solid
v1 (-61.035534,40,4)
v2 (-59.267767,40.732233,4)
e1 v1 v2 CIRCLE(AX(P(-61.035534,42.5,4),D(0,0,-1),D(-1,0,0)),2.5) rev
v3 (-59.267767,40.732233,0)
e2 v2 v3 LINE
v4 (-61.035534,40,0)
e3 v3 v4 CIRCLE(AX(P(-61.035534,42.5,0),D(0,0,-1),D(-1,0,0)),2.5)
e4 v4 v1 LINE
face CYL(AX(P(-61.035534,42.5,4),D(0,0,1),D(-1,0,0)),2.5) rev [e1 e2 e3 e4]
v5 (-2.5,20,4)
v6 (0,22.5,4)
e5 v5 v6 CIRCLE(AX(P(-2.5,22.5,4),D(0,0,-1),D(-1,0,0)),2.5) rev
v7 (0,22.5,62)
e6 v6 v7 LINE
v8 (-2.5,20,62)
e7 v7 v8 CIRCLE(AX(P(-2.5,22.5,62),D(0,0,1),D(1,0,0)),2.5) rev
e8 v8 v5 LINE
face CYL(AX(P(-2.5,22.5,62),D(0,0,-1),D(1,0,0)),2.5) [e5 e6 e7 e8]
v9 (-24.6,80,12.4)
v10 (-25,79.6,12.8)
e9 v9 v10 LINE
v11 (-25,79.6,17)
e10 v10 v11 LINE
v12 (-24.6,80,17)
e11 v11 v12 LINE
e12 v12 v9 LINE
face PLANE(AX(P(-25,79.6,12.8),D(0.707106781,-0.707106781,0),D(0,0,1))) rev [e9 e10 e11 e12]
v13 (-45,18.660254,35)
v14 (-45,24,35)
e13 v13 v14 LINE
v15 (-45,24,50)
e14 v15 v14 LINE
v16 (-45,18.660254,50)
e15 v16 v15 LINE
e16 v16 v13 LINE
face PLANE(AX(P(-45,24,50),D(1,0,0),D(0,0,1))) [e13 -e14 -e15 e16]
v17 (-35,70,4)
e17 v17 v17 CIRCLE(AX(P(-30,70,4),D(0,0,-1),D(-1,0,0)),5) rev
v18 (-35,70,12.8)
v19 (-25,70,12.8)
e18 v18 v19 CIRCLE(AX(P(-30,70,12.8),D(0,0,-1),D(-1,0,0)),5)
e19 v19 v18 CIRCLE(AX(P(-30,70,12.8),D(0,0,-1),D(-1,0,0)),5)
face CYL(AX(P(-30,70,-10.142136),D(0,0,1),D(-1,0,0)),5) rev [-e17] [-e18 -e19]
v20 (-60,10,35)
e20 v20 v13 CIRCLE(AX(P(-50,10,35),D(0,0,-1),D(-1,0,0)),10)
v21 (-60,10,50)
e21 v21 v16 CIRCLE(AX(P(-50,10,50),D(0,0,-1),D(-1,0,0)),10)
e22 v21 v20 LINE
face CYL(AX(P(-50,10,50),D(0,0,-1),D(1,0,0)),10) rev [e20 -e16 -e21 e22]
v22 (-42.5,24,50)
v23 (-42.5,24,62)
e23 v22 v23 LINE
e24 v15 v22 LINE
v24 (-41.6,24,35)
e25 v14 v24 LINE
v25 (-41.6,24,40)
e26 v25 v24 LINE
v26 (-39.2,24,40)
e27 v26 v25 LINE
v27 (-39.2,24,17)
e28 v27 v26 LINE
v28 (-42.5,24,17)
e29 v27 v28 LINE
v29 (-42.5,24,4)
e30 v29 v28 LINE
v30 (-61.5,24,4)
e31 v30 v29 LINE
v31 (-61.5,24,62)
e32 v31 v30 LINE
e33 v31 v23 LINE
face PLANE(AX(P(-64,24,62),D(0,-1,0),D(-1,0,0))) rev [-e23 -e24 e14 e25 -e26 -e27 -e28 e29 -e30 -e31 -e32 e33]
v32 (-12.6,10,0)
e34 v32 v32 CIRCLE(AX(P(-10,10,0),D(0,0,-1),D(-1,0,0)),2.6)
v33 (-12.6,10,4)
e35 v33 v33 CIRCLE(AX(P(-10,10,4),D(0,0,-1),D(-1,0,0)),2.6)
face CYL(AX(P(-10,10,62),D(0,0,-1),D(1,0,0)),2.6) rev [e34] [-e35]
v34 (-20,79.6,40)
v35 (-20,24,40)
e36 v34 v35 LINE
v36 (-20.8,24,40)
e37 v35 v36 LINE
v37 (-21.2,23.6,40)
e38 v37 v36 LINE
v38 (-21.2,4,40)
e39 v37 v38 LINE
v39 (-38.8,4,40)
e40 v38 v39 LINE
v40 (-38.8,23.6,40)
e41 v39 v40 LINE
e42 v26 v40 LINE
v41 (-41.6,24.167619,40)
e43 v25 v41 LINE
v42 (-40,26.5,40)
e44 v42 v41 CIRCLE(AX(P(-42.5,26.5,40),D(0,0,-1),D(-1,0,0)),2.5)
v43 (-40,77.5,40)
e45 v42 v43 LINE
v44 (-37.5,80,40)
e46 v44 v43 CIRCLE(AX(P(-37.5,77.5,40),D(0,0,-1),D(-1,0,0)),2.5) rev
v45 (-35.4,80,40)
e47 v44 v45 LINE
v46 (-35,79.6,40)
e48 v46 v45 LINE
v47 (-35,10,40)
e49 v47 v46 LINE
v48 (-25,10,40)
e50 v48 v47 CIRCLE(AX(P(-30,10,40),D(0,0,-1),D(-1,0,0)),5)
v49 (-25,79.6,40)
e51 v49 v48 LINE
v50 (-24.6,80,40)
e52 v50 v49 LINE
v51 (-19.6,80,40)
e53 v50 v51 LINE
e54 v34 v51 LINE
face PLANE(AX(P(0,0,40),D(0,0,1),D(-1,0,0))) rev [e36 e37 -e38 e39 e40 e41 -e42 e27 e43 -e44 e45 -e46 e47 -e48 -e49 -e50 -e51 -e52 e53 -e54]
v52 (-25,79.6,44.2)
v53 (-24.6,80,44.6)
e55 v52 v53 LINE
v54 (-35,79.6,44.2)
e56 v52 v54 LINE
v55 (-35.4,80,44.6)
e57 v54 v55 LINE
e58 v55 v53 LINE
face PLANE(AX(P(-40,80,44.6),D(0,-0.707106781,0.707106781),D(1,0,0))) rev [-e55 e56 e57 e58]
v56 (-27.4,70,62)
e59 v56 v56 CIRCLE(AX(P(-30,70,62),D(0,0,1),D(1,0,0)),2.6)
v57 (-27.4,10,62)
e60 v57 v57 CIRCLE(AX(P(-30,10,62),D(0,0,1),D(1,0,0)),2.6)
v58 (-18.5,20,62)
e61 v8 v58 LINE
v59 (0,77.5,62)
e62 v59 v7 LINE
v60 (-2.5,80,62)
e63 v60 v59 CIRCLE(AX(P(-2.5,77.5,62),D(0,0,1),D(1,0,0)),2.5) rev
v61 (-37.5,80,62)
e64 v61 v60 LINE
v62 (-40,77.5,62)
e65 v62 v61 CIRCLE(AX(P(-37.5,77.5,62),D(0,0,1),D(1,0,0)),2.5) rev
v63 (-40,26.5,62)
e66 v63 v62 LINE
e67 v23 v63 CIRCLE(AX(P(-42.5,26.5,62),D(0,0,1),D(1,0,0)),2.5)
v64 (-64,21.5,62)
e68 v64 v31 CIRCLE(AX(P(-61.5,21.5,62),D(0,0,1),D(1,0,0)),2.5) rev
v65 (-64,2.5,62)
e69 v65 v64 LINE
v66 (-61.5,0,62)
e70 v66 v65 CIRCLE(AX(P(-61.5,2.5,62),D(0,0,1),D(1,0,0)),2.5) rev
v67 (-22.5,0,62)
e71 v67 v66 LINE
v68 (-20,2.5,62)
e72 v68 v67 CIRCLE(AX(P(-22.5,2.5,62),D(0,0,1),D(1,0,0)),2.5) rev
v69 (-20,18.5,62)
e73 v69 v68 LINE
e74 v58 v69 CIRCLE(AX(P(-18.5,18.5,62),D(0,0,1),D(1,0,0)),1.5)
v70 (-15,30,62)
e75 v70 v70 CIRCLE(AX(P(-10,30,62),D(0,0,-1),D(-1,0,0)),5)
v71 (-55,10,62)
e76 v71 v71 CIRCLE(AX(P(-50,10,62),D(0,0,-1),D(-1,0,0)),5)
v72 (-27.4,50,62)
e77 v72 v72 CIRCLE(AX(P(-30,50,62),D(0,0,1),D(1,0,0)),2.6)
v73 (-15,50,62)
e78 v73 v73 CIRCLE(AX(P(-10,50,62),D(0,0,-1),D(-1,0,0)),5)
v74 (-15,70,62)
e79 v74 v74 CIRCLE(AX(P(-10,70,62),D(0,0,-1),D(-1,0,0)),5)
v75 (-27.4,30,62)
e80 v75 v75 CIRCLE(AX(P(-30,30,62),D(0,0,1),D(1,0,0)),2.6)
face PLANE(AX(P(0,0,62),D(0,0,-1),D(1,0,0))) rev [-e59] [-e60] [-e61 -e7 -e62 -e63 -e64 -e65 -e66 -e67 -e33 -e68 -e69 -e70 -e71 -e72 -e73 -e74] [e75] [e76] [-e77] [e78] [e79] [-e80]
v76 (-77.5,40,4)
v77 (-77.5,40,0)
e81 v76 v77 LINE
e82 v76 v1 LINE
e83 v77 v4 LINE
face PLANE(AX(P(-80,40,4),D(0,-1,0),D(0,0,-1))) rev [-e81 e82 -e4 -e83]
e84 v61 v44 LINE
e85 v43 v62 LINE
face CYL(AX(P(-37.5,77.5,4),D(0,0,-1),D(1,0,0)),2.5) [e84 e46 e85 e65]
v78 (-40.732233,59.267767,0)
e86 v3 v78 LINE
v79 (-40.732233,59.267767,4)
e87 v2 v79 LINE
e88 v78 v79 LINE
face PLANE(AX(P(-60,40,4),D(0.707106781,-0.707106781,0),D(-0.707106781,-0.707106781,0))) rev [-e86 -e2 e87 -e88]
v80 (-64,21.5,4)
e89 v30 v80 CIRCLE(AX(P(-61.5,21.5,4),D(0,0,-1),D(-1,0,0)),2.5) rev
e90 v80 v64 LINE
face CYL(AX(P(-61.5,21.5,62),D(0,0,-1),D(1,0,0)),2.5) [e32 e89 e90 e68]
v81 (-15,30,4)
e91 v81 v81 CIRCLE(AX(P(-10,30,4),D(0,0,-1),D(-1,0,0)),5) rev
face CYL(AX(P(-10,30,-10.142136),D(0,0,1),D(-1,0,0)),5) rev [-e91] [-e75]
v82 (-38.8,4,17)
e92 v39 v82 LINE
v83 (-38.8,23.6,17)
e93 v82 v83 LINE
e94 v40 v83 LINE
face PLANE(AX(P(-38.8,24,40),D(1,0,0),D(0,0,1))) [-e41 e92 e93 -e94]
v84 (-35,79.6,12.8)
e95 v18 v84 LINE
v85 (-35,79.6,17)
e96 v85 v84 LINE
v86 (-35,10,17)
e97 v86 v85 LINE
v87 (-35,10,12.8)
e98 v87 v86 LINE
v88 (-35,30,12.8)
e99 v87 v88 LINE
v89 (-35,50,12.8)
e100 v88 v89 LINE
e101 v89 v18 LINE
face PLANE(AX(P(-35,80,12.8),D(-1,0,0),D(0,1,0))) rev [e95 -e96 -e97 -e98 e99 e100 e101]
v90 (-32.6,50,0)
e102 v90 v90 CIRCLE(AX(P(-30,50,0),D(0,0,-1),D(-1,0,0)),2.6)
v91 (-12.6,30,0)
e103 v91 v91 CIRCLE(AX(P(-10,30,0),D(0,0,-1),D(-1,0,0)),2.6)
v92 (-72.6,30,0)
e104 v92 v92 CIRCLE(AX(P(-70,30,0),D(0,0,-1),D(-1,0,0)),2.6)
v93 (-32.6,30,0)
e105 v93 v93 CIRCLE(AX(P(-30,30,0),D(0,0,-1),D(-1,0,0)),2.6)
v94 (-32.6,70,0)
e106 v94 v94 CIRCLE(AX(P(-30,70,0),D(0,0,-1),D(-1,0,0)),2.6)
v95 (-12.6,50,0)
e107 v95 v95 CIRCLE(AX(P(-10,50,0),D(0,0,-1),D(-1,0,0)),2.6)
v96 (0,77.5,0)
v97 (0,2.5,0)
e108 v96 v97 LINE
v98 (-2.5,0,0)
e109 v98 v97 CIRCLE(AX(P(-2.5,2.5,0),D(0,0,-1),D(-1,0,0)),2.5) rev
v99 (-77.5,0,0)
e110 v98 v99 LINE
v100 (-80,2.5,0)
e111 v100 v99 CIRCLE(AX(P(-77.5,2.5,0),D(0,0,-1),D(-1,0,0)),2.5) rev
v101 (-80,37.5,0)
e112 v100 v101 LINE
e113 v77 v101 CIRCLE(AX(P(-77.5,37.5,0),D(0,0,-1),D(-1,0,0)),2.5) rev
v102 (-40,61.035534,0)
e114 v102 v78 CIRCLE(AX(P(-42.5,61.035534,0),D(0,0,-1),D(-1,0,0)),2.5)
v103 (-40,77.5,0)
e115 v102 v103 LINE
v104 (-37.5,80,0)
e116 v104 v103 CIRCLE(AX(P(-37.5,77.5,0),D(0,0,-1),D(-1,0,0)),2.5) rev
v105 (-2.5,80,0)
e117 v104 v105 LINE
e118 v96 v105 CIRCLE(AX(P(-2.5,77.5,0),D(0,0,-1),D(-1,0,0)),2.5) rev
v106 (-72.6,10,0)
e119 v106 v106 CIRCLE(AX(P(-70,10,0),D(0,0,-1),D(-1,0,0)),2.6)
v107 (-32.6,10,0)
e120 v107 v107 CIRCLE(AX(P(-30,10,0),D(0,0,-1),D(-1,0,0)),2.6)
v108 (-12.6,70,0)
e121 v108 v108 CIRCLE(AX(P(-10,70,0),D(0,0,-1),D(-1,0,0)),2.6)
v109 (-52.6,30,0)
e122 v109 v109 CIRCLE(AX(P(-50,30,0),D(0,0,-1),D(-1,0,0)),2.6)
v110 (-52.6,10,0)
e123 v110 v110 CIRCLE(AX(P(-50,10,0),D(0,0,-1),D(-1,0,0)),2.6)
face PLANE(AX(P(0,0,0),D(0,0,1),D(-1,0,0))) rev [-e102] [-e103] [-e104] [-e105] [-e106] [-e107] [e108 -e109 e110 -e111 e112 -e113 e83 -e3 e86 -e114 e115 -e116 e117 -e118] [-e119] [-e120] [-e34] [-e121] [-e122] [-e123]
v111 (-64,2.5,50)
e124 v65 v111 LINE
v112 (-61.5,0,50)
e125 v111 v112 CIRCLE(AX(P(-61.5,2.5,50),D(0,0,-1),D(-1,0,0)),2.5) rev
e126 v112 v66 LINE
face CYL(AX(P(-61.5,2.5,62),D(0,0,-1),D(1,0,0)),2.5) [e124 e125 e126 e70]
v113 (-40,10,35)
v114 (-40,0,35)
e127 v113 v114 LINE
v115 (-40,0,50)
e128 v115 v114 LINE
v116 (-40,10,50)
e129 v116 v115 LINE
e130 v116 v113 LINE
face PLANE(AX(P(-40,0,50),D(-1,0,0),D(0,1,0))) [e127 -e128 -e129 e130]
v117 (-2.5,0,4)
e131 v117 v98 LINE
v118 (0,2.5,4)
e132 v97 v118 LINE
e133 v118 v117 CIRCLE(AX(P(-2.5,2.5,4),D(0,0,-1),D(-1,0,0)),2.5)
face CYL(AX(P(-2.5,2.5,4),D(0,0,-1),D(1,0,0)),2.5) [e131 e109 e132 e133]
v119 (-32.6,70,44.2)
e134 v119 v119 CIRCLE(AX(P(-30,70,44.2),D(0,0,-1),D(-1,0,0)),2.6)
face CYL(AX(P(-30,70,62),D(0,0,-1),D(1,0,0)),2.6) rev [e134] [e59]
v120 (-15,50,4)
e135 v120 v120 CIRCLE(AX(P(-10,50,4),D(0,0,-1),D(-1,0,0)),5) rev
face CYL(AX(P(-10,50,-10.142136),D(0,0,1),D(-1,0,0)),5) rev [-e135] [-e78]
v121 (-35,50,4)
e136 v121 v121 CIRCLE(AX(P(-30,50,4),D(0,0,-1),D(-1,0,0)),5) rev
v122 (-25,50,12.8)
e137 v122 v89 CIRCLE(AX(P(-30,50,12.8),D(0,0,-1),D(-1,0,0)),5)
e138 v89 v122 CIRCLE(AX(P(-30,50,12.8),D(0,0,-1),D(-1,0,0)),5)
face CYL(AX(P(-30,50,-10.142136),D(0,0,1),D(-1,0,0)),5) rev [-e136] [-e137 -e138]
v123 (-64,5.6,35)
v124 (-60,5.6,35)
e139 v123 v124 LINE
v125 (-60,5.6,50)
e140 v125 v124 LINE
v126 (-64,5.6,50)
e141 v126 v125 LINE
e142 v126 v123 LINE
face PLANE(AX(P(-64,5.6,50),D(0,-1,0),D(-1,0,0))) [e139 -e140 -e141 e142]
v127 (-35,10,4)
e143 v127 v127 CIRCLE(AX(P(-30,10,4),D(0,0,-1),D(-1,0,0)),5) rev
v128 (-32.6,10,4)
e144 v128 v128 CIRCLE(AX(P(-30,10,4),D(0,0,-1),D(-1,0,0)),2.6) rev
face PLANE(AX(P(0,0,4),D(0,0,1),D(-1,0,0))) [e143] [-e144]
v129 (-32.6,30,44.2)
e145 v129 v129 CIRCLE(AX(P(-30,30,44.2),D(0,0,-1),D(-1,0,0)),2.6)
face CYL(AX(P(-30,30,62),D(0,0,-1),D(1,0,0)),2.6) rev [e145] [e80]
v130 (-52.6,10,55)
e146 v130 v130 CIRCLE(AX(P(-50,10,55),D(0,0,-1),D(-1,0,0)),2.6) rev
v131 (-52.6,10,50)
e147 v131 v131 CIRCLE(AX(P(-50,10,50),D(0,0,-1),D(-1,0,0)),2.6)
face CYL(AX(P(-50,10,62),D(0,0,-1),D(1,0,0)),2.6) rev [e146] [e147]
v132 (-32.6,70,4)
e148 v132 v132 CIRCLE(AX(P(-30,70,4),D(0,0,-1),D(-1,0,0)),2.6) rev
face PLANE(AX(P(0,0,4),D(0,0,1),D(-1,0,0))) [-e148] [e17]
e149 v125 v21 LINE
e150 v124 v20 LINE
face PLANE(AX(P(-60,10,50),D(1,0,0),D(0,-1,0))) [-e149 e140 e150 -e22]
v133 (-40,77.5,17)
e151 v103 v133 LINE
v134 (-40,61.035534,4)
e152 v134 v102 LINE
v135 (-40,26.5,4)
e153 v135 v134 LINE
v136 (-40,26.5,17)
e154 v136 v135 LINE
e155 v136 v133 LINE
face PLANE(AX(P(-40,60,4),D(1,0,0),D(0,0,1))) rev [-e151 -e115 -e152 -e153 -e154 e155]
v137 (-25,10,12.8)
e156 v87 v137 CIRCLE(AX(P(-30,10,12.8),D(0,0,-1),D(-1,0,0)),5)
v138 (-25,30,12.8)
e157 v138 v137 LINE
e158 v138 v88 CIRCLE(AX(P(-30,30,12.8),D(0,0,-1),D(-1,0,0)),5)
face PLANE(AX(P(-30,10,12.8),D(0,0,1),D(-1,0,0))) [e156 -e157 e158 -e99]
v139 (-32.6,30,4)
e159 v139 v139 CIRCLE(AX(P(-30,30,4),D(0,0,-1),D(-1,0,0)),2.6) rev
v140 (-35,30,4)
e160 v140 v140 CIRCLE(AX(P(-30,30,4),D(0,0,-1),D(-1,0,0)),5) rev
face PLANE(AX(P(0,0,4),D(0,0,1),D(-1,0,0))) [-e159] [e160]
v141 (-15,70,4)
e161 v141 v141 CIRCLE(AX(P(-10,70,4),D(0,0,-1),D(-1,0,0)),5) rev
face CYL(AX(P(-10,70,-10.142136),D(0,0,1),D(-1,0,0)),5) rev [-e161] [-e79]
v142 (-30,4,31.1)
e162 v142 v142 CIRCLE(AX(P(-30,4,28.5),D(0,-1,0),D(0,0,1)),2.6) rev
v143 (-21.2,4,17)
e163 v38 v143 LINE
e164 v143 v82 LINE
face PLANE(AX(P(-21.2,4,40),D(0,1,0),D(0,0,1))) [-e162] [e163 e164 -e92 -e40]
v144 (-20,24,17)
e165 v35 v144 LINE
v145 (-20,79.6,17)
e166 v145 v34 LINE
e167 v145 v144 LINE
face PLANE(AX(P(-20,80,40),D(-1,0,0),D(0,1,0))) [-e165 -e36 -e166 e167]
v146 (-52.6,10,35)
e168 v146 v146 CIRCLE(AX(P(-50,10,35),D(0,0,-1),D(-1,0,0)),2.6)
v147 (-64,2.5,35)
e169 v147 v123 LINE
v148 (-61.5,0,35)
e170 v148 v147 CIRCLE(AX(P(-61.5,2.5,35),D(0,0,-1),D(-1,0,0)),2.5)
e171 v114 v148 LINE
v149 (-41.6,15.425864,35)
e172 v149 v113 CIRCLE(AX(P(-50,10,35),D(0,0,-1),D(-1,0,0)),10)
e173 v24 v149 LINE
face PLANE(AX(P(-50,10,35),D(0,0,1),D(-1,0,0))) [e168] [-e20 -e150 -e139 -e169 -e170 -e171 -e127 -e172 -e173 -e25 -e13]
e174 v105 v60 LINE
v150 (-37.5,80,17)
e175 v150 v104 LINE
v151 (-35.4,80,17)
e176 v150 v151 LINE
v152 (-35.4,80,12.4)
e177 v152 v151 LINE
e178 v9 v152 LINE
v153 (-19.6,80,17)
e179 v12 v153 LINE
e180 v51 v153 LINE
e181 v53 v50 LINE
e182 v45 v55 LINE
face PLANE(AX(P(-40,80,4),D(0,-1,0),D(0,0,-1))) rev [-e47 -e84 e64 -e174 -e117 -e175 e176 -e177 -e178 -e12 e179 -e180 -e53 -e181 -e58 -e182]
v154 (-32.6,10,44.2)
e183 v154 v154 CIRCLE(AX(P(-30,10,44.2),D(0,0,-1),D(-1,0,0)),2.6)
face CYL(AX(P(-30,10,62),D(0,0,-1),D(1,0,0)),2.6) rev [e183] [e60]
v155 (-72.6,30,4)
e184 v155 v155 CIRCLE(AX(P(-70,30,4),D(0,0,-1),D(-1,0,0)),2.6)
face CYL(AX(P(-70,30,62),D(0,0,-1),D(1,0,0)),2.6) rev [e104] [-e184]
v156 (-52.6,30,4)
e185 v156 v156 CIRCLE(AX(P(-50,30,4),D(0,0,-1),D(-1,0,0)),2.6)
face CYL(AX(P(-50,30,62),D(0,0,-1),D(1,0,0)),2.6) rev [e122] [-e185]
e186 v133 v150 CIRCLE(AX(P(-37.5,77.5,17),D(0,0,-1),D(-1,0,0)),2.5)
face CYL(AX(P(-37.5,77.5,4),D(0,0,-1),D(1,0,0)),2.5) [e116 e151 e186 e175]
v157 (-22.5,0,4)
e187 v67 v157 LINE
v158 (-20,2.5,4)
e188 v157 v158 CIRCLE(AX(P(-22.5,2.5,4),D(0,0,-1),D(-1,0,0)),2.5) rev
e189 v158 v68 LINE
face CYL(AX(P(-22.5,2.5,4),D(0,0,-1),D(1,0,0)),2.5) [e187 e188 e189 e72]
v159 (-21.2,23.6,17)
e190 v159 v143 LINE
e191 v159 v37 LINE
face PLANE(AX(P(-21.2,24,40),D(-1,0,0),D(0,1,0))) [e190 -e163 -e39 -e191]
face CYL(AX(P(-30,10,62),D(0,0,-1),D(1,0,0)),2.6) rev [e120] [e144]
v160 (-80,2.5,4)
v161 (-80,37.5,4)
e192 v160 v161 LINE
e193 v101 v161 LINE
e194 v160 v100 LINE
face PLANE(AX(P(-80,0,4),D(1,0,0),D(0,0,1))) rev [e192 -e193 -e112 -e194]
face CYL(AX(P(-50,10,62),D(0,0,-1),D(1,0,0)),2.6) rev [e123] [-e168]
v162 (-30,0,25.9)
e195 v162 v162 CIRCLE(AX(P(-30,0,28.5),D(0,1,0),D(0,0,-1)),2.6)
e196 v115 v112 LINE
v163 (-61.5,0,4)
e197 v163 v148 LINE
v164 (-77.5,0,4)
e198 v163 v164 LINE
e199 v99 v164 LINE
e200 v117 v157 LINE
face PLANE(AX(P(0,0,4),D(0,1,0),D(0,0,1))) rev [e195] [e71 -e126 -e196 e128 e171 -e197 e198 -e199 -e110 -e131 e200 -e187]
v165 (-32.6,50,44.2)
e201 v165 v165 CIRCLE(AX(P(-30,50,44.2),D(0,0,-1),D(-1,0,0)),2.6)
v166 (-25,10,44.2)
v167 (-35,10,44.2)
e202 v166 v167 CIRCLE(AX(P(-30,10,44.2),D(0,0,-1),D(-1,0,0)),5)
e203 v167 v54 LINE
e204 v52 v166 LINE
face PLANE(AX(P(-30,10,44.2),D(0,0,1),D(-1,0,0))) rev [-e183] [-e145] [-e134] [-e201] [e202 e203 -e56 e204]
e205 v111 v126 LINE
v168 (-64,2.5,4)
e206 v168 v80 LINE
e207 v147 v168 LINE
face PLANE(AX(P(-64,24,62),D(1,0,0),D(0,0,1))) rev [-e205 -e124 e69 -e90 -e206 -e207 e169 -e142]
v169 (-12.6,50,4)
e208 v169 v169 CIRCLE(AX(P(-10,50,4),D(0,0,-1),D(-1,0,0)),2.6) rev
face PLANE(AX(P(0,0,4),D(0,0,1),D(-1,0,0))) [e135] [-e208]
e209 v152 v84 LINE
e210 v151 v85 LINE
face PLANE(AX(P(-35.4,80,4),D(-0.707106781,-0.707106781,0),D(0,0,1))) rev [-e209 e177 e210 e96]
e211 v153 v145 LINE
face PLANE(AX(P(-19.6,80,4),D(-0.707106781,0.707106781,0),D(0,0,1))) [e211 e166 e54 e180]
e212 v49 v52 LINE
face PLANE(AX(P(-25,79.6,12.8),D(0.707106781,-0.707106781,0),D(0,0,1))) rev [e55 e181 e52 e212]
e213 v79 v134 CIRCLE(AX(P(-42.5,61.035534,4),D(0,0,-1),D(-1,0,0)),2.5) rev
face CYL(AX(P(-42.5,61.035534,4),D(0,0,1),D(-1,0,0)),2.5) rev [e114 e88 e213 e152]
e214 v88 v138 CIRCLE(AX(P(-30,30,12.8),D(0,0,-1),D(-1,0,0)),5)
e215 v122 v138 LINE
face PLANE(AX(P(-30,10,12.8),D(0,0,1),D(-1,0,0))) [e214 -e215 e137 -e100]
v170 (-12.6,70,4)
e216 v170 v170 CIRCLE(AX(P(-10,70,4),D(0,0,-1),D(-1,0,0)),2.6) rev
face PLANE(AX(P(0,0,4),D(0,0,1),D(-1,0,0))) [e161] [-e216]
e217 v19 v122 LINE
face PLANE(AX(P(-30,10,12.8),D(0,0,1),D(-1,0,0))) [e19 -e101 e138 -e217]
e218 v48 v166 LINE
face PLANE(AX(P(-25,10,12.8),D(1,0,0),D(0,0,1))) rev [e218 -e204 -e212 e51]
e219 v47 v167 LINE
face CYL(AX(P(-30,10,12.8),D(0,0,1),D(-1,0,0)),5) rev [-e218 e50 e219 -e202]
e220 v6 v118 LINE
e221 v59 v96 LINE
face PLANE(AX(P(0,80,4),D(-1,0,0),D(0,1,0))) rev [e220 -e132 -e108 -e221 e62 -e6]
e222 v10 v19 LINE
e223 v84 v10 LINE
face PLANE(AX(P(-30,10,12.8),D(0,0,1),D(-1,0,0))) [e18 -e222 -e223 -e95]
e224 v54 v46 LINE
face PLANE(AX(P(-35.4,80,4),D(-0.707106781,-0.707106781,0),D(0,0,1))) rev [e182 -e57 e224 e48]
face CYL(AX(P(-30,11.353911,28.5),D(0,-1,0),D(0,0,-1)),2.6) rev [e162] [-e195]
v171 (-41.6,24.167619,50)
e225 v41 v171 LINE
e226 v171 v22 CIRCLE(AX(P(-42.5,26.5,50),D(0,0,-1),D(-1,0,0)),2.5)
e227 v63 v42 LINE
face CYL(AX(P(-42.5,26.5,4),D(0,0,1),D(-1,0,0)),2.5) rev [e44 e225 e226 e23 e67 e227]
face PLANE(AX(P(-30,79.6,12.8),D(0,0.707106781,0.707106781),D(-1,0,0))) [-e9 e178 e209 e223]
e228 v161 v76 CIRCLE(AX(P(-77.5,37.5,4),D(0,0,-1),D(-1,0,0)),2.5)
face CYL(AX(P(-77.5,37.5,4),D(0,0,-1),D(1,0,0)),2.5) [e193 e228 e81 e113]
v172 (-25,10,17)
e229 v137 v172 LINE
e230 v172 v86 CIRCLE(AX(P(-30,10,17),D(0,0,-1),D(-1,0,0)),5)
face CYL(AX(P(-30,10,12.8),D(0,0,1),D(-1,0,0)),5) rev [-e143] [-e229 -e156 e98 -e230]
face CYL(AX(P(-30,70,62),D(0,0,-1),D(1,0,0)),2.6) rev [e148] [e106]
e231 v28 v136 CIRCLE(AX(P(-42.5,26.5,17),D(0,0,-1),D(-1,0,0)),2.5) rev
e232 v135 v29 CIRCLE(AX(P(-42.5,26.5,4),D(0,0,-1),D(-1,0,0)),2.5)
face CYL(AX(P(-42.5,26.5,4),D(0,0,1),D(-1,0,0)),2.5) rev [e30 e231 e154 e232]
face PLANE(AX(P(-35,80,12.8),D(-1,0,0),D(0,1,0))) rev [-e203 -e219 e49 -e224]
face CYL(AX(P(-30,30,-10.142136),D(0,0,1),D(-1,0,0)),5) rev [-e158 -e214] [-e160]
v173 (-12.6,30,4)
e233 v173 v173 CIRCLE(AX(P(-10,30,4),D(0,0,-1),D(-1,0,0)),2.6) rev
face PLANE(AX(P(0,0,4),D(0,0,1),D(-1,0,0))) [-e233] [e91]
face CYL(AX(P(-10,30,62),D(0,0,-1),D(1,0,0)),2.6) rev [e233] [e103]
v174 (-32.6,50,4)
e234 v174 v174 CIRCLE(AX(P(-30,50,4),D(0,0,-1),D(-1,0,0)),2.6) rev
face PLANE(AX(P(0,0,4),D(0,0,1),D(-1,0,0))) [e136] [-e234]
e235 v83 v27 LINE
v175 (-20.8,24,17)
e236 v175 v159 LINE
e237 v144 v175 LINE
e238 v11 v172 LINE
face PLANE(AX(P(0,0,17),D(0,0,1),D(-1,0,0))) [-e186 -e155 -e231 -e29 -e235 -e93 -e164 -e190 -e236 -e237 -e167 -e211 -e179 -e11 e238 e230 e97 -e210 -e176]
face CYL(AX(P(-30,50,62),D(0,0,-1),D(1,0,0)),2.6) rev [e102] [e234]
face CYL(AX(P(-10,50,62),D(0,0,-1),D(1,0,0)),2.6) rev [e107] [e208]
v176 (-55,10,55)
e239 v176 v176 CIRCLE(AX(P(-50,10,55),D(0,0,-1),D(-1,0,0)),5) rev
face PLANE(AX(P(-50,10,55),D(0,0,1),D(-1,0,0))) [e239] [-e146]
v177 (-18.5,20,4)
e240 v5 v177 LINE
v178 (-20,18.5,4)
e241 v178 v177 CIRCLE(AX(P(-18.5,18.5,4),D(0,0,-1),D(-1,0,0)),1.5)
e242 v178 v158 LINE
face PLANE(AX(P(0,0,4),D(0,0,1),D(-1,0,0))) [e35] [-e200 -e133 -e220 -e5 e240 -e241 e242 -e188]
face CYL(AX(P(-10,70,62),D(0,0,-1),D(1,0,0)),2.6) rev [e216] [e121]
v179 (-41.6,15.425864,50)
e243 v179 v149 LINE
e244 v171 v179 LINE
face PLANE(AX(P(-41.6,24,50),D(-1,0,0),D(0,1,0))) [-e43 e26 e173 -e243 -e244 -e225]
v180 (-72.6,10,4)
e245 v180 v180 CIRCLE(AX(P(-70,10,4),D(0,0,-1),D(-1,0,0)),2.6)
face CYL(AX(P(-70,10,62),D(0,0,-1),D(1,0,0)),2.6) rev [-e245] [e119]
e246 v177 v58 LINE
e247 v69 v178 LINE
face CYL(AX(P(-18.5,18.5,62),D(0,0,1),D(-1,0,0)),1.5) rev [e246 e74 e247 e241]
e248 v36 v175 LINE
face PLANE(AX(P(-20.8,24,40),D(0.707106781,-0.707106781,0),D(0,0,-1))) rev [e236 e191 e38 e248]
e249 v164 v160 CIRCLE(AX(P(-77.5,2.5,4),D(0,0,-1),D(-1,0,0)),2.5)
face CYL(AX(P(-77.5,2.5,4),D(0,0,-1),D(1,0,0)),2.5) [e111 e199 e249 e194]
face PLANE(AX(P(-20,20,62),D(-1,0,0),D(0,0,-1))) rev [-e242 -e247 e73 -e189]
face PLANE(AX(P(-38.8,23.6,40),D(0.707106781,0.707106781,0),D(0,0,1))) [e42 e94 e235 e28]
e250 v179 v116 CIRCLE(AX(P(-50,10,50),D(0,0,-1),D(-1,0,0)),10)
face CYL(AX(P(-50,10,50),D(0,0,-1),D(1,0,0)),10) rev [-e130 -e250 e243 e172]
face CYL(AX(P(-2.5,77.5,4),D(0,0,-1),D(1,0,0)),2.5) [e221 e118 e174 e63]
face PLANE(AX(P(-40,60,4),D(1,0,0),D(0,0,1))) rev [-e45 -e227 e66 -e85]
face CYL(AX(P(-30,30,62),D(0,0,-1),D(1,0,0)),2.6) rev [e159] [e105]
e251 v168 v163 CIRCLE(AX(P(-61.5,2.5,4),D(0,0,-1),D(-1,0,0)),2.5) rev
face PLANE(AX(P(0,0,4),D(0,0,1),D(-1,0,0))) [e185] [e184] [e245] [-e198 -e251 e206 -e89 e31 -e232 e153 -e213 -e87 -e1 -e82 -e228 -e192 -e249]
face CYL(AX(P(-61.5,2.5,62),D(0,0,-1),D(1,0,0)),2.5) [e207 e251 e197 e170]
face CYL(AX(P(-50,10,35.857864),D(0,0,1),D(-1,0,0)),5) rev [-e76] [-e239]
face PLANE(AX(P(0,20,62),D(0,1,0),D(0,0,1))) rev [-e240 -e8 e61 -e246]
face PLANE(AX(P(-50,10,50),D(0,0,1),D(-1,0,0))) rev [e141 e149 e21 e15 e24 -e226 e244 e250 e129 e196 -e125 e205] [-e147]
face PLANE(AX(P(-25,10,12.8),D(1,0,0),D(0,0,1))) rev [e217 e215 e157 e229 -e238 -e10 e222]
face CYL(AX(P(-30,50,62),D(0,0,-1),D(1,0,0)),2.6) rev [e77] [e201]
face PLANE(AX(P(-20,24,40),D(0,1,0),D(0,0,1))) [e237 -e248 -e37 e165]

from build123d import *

# Parameters (mm, degrees)
EXTRUDE_1_DEPTH          = 4
EXTRUDE_3_DEPTH          = 58
CUT_EXTRUDE_6_DEPTH      = 11.5
CUT_EXTRUDE_4_DEPTH      = 15.7
CUT_EXTRUDE_3_DEPTH      = 7.5
CUT_EXTRUDE_7_DEPTH      = 130.011627383
CUT_EXTRUDE_7_DEPTH_BACK = 130.011627383
SKETCH_11_R              = 2.6
SKETCH_12_R              = 5
CUT_EXTRUDE_8_DEPTH      = 58
SKETCH_16_R              = 5
CUT_EXTRUDE_11_DEPTH     = 13
SKETCH_13_R              = 5
CUT_EXTRUDE_9_DEPTH      = 7
SKETCH_14_R              = 2.6
CUT_EXTRUDE_10_DEPTH     = 4
CHAMFER_1_SIZE           = 0.4
FILLET_1_R               = 1.5
FILLET_2_R               = 2.5


with BuildPart() as part:
    # Эскиз1 → Бобышка-Вытянуть1 (new body)
    with BuildSketch(Plane.XY):
        Polygon((0, 0), (80, 0), (80, 40), (60, 40), (40, 60), (40, 80), (0, 80), align=None)
    extrude(amount=EXTRUDE_1_DEPTH)

    # Эскиз7 → Бобышка-Вытянуть3 (add)
    with BuildSketch(Plane.XY.offset(4)):
        Polygon((64, 24), (64, 0), (20, 0), (20, 20), (0, 20), (0, 80), (40, 80), (40, 24), align=None)
    extrude(amount=EXTRUDE_3_DEPTH)

    # Эскиз9 → Вырез-Вытянуть6 (cut, symmetric)
    with BuildSketch(Plane.XY.offset(28.5)):
        Polygon((20, 80), (40, 80), (40, 24), (38.8, 24), (38.8, 4), (21.2, 4), (21.2, 24), (20, 24), align=None)
    extrude(amount=CUT_EXTRUDE_6_DEPTH, both=True, mode=Mode.SUBTRACT)

    # Эскиз8 → Вырез-Вытянуть4 (cut, symmetric)
    with BuildSketch(Plane.XY.offset(28.5)):
        with BuildLine():
            Line((25, 10), (25, 80))
            Line((25, 80), (35, 80))
            Line((35, 80), (35, 10))
            ThreePointArc((35, 10), (30, 5), (25, 10))
        make_face()
    extrude(amount=CUT_EXTRUDE_4_DEPTH, both=True, mode=Mode.SUBTRACT)

    # Эскиз6 → Вырез-Вытянуть3 (cut, symmetric)
    with BuildSketch(Plane.XY.offset(42.5)):
        with BuildLine():
            Line((41.6, 24), (45, 24))
            Line((45, 24), (45, 18.660254038))
            ThreePointArc((45, 18.660254038), (55, 18.660254038), (60, 10))
            Line((60, 10), (60, 5.6))
            Line((60, 5.6), (64, 5.6))
            Line((64, 5.6), (64, 0))
            Line((64, 0), (40, 0))
            Line((40, 0), (40, 10))
            ThreePointArc((40, 10), (40.408336953, 12.828427125), (41.6, 15.425863987))
            Line((41.6, 15.425863987), (41.6, 24))
        make_face()
    extrude(amount=CUT_EXTRUDE_3_DEPTH, both=True, mode=Mode.SUBTRACT)

    # Эскиз11 → Вырез-Вытянуть7 (cut, two sides: drawn at the far end of the back side and taken through both)
    with BuildSketch(Plane(origin=(0, 0, 0), x_dir=(-1, 0, 0), z_dir=(0, 0, -1)).offset(-CUT_EXTRUDE_7_DEPTH_BACK)):
        with Locations(Location((-10, 10, 0), (0, 0, 180))):
            Circle(SKETCH_11_R)
        with Locations((-30, 30)):
            Circle(SKETCH_11_R)
        with Locations((-30, 50)):
            Circle(SKETCH_11_R)
        with Locations((-30, 70)):
            Circle(SKETCH_11_R)
        with Locations((-10, 30)):
            Circle(SKETCH_11_R)
        with Locations((-10, 50)):
            Circle(SKETCH_11_R)
        with Locations((-10, 70)):
            Circle(SKETCH_11_R)
        with Locations(Location((-50, 10, 0), (0, 0, 180))):
            Circle(SKETCH_11_R)
        with Locations(Location((-50, 30, 0), (0, 0, 180))):
            Circle(SKETCH_11_R)
        with Locations(Location((-70, 10, 0), (0, 0, 180))):
            Circle(SKETCH_11_R)
        with Locations(Location((-70, 30, 0), (0, 0, 180))):
            Circle(SKETCH_11_R)
        with Locations((-30, 10)):
            Circle(SKETCH_11_R)
    extrude(amount=CUT_EXTRUDE_7_DEPTH + CUT_EXTRUDE_7_DEPTH_BACK, mode=Mode.SUBTRACT)

    # Эскиз12 → Вырез-Вытянуть8 (cut)
    with BuildSketch(Plane.XY.offset(62)):
        with Locations((10, 70)):
            Circle(SKETCH_12_R)
        with Locations((10, 50)):
            Circle(SKETCH_12_R)
        with Locations((10, 30)):
            Circle(SKETCH_12_R)
    extrude(amount=-CUT_EXTRUDE_8_DEPTH, mode=Mode.SUBTRACT)

    # Эскиз16 → Вырез-Вытянуть11 (cut)
    with BuildSketch(Plane.XY.offset(17)):
        with Locations((30, 70)):
            Circle(SKETCH_16_R)
        with Locations((30, 50)):
            Circle(SKETCH_16_R)
        with Locations((30, 30)):
            Circle(SKETCH_16_R)
        with Locations((30, 10)):
            Circle(SKETCH_16_R)
    extrude(amount=-CUT_EXTRUDE_11_DEPTH, mode=Mode.SUBTRACT)

    # Эскиз13 → Вырез-Вытянуть9 (cut)
    with BuildSketch(Plane.XY.offset(62)):
        with Locations((50, 10)):
            Circle(SKETCH_13_R)
    extrude(amount=-CUT_EXTRUDE_9_DEPTH, mode=Mode.SUBTRACT)

    # Эскиз14 → Вырез-Вытянуть10 (cut)
    with BuildSketch(Plane.XZ):
        with Locations(Location((30, 28.5, 0), (0, 0, 270))):
            Circle(SKETCH_14_R)
    extrude(amount=-CUT_EXTRUDE_10_DEPTH, mode=Mode.SUBTRACT)

    # Фаска1
    chamfer_1_edges = [part.edges().sort_by_distance(p)[0] for p in [
        (20, 80, 28.5),
        (21.2, 24, 28.5),
        (38.8, 24, 28.5),
        (25, 80, 42.1),
        (35, 80, 42.1),
        (30, 80, 12.8),
        (25, 80, 14.9),
        (35, 80, 14.9),
        (30, 80, 44.2),
    ]]
    chamfer(chamfer_1_edges, length=CHAMFER_1_SIZE)

    # Скругление1
    fillet_1_edges = [part.edges().sort_by_distance(p)[0] for p in [
        (20, 20, 33),
    ]]
    fillet(fillet_1_edges, radius=FILLET_1_R)

    # Скругление2
    # the kernel refuses this fillet: 2.5 mm, written as the material it adds along each edge
    with BuildSketch(Plane(origin=(40, 60, 0), x_dir=(0, 1, 0), z_dir=(0, 0, 1))) as fillet_2_piece_1:
        with BuildLine():
            CenterArc((FILLET_2_R * 0.414213562373, -FILLET_2_R), FILLET_2_R, 90, 45)
            Line((-FILLET_2_R * 0.292893218813, -FILLET_2_R * 0.292893218813), (0, 0))
            Line((0, 0), (FILLET_2_R * 0.414213562373, 0))
        make_face()
    extrude(amount=4)
    with BuildSketch(Plane(origin=(60, 40, 0), x_dir=(1, 0, 0), z_dir=(0, 0, 1))) as fillet_2_piece_2:
        with BuildLine():
            CenterArc((FILLET_2_R * 0.414213562373, FILLET_2_R), FILLET_2_R, 225, 45)
            Line((-FILLET_2_R * 0.292893218813, FILLET_2_R * 0.292893218813), (0, 0))
            Line((0, 0), (FILLET_2_R * 0.414213562373, 0))
        make_face()
    extrude(amount=4)
    with BuildSketch(Plane(origin=(40, 24, 40), x_dir=(1, 0, 0), z_dir=(0, 0, 1))) as fillet_2_piece_3_section:
        with BuildLine():
            CenterArc((FILLET_2_R, FILLET_2_R), FILLET_2_R, 180, 90)
            Line((0, FILLET_2_R), (0, 0))
            Line((0, 0), (FILLET_2_R, 0))
        make_face()
    fillet_2_piece_3 = extrude(amount=22, mode=Mode.PRIVATE)
    fillet_2_piece_3 = split(fillet_2_piece_3, bisect_by=Plane(origin=(41.6, 24.577940424, 45), z_dir=(-1, 0, 0)), keep=Keep.TOP, mode=Mode.PRIVATE)
    add(fillet_2_piece_3)
    with BuildSketch(Plane(origin=(40, 24, 33.75), x_dir=(1, 0, 0), z_dir=(0, 0, 1))) as fillet_2_piece_4_section:
        with BuildLine():
            CenterArc((FILLET_2_R, FILLET_2_R), FILLET_2_R, 180, 90)
            Line((0, FILLET_2_R), (0, 0))
            Line((0, 0), (FILLET_2_R, 0))
        make_face()
    fillet_2_piece_4 = extrude(amount=28.25, mode=Mode.PRIVATE)
    fillet_2_piece_4 = split(fillet_2_piece_4, bisect_by=Plane(origin=(41.823463769, 24.049982966, 50), z_dir=(0, 0, 1)), keep=Keep.TOP, mode=Mode.PRIVATE)
    add(fillet_2_piece_4)
    with BuildSketch(Plane(origin=(40, 24, 4), x_dir=(1, 0, 0), z_dir=(0, 0, 1))) as fillet_2_piece_5:
        with BuildLine():
            CenterArc((FILLET_2_R, FILLET_2_R), FILLET_2_R, 180, 90)
            Line((0, FILLET_2_R), (0, 0))
            Line((0, 0), (FILLET_2_R, 0))
        make_face()
    extrude(amount=13)
    # the kernel refuses this fillet: 2.5 mm, written as the material it takes off along each edge
    with BuildSketch(Plane(origin=(0, 80, 68.25), x_dir=(1, 0, 0), z_dir=(0, 0, -1))) as fillet_2_2_piece_1:
        with BuildLine():
            CenterArc((FILLET_2_R, FILLET_2_R), FILLET_2_R, 180, 90)
            Line((0, FILLET_2_R), (0, 0))
            Line((0, 0), (FILLET_2_R, 0))
        make_face()
    extrude(amount=74.5, mode=Mode.SUBTRACT)
    with BuildSketch(Plane(origin=(40, 80, 68.25), x_dir=(0, -1, 0), z_dir=(0, 0, -1))) as fillet_2_2_piece_2:
        with BuildLine():
            CenterArc((FILLET_2_R, FILLET_2_R), FILLET_2_R, 180, 90)
            Line((0, FILLET_2_R), (0, 0))
            Line((0, 0), (FILLET_2_R, 0))
        make_face()
    extrude(amount=34.5, mode=Mode.SUBTRACT)
    with BuildSketch(Plane(origin=(80, 40, -6.25), x_dir=(-1, 0, 0), z_dir=(0, 0, 1)), Plane(origin=(80, 0, -6.25), x_dir=(0, 1, 0), z_dir=(0, 0, 1))) as fillet_2_2_piece_3:
        with BuildLine():
            CenterArc((FILLET_2_R, FILLET_2_R), FILLET_2_R, 180, 90)
            Line((0, FILLET_2_R), (0, 0))
            Line((0, 0), (FILLET_2_R, 0))
        make_face()
    extrude(amount=16.5, mode=Mode.SUBTRACT)
    with BuildSketch(Plane(origin=(0, 0, -6.25), x_dir=(0, 1, 0), z_dir=(0, 0, 1))) as fillet_2_2_piece_4:
        with BuildLine():
            CenterArc((FILLET_2_R, -FILLET_2_R), FILLET_2_R, 90, 90)
            Line((0, -FILLET_2_R), (0, 0))
            Line((0, 0), (FILLET_2_R, 0))
        make_face()
    extrude(amount=16.5, mode=Mode.SUBTRACT)
    with BuildSketch(Plane(origin=(20, 0, 4), x_dir=(0, 1, 0), z_dir=(0, 0, 1)), Plane(origin=(64, 24, 4), x_dir=(0, -1, 0), z_dir=(0, 0, 1)), Plane(origin=(0, 20, 4), x_dir=(0, 1, 0), z_dir=(0, 0, 1))) as fillet_2_2_piece_5:
        with BuildLine():
            CenterArc((FILLET_2_R, -FILLET_2_R), FILLET_2_R, 90, 90)
            Line((0, -FILLET_2_R), (0, 0))
            Line((0, 0), (FILLET_2_R, 0))
        make_face()
    extrude(amount=64.25, mode=Mode.SUBTRACT)
    with BuildSketch(Plane(origin=(64, 0, 43.75), x_dir=(0, 1, 0), z_dir=(0, 0, 1))) as fillet_2_2_piece_6:
        with BuildLine():
            CenterArc((FILLET_2_R, FILLET_2_R), FILLET_2_R, 180, 90)
            Line((0, FILLET_2_R), (0, 0))
            Line((0, 0), (FILLET_2_R, 0))
        make_face()
    extrude(amount=24.5, mode=Mode.SUBTRACT)
    with BuildSketch(Plane(origin=(40, 80, 23.25), x_dir=(0, -1, 0), z_dir=(0, 0, -1))) as fillet_2_2_piece_7:
        with BuildLine():
            CenterArc((FILLET_2_R, FILLET_2_R), FILLET_2_R, 180, 90)
            Line((0, FILLET_2_R), (0, 0))
            Line((0, 0), (FILLET_2_R, 0))
        make_face()
    extrude(amount=29.5, mode=Mode.SUBTRACT)
    with BuildSketch(Plane(origin=(64, 0, 4), x_dir=(0, 1, 0), z_dir=(0, 0, 1))) as fillet_2_2_piece_8:
        with BuildLine():
            CenterArc((FILLET_2_R, FILLET_2_R), FILLET_2_R, 180, 90)
            Line((0, FILLET_2_R), (0, 0))
            Line((0, 0), (FILLET_2_R, 0))
        make_face()
    extrude(amount=37.25, mode=Mode.SUBTRACT)


with BuildPart() as body_2:
    # Зеркальное отражение1: mirrored copy
    add(part.part.mirror(Plane(origin=(0, 0, 0), x_dir=(0, 0, 1), z_dir=(1, 0, 0))))


solid = body_2.part
